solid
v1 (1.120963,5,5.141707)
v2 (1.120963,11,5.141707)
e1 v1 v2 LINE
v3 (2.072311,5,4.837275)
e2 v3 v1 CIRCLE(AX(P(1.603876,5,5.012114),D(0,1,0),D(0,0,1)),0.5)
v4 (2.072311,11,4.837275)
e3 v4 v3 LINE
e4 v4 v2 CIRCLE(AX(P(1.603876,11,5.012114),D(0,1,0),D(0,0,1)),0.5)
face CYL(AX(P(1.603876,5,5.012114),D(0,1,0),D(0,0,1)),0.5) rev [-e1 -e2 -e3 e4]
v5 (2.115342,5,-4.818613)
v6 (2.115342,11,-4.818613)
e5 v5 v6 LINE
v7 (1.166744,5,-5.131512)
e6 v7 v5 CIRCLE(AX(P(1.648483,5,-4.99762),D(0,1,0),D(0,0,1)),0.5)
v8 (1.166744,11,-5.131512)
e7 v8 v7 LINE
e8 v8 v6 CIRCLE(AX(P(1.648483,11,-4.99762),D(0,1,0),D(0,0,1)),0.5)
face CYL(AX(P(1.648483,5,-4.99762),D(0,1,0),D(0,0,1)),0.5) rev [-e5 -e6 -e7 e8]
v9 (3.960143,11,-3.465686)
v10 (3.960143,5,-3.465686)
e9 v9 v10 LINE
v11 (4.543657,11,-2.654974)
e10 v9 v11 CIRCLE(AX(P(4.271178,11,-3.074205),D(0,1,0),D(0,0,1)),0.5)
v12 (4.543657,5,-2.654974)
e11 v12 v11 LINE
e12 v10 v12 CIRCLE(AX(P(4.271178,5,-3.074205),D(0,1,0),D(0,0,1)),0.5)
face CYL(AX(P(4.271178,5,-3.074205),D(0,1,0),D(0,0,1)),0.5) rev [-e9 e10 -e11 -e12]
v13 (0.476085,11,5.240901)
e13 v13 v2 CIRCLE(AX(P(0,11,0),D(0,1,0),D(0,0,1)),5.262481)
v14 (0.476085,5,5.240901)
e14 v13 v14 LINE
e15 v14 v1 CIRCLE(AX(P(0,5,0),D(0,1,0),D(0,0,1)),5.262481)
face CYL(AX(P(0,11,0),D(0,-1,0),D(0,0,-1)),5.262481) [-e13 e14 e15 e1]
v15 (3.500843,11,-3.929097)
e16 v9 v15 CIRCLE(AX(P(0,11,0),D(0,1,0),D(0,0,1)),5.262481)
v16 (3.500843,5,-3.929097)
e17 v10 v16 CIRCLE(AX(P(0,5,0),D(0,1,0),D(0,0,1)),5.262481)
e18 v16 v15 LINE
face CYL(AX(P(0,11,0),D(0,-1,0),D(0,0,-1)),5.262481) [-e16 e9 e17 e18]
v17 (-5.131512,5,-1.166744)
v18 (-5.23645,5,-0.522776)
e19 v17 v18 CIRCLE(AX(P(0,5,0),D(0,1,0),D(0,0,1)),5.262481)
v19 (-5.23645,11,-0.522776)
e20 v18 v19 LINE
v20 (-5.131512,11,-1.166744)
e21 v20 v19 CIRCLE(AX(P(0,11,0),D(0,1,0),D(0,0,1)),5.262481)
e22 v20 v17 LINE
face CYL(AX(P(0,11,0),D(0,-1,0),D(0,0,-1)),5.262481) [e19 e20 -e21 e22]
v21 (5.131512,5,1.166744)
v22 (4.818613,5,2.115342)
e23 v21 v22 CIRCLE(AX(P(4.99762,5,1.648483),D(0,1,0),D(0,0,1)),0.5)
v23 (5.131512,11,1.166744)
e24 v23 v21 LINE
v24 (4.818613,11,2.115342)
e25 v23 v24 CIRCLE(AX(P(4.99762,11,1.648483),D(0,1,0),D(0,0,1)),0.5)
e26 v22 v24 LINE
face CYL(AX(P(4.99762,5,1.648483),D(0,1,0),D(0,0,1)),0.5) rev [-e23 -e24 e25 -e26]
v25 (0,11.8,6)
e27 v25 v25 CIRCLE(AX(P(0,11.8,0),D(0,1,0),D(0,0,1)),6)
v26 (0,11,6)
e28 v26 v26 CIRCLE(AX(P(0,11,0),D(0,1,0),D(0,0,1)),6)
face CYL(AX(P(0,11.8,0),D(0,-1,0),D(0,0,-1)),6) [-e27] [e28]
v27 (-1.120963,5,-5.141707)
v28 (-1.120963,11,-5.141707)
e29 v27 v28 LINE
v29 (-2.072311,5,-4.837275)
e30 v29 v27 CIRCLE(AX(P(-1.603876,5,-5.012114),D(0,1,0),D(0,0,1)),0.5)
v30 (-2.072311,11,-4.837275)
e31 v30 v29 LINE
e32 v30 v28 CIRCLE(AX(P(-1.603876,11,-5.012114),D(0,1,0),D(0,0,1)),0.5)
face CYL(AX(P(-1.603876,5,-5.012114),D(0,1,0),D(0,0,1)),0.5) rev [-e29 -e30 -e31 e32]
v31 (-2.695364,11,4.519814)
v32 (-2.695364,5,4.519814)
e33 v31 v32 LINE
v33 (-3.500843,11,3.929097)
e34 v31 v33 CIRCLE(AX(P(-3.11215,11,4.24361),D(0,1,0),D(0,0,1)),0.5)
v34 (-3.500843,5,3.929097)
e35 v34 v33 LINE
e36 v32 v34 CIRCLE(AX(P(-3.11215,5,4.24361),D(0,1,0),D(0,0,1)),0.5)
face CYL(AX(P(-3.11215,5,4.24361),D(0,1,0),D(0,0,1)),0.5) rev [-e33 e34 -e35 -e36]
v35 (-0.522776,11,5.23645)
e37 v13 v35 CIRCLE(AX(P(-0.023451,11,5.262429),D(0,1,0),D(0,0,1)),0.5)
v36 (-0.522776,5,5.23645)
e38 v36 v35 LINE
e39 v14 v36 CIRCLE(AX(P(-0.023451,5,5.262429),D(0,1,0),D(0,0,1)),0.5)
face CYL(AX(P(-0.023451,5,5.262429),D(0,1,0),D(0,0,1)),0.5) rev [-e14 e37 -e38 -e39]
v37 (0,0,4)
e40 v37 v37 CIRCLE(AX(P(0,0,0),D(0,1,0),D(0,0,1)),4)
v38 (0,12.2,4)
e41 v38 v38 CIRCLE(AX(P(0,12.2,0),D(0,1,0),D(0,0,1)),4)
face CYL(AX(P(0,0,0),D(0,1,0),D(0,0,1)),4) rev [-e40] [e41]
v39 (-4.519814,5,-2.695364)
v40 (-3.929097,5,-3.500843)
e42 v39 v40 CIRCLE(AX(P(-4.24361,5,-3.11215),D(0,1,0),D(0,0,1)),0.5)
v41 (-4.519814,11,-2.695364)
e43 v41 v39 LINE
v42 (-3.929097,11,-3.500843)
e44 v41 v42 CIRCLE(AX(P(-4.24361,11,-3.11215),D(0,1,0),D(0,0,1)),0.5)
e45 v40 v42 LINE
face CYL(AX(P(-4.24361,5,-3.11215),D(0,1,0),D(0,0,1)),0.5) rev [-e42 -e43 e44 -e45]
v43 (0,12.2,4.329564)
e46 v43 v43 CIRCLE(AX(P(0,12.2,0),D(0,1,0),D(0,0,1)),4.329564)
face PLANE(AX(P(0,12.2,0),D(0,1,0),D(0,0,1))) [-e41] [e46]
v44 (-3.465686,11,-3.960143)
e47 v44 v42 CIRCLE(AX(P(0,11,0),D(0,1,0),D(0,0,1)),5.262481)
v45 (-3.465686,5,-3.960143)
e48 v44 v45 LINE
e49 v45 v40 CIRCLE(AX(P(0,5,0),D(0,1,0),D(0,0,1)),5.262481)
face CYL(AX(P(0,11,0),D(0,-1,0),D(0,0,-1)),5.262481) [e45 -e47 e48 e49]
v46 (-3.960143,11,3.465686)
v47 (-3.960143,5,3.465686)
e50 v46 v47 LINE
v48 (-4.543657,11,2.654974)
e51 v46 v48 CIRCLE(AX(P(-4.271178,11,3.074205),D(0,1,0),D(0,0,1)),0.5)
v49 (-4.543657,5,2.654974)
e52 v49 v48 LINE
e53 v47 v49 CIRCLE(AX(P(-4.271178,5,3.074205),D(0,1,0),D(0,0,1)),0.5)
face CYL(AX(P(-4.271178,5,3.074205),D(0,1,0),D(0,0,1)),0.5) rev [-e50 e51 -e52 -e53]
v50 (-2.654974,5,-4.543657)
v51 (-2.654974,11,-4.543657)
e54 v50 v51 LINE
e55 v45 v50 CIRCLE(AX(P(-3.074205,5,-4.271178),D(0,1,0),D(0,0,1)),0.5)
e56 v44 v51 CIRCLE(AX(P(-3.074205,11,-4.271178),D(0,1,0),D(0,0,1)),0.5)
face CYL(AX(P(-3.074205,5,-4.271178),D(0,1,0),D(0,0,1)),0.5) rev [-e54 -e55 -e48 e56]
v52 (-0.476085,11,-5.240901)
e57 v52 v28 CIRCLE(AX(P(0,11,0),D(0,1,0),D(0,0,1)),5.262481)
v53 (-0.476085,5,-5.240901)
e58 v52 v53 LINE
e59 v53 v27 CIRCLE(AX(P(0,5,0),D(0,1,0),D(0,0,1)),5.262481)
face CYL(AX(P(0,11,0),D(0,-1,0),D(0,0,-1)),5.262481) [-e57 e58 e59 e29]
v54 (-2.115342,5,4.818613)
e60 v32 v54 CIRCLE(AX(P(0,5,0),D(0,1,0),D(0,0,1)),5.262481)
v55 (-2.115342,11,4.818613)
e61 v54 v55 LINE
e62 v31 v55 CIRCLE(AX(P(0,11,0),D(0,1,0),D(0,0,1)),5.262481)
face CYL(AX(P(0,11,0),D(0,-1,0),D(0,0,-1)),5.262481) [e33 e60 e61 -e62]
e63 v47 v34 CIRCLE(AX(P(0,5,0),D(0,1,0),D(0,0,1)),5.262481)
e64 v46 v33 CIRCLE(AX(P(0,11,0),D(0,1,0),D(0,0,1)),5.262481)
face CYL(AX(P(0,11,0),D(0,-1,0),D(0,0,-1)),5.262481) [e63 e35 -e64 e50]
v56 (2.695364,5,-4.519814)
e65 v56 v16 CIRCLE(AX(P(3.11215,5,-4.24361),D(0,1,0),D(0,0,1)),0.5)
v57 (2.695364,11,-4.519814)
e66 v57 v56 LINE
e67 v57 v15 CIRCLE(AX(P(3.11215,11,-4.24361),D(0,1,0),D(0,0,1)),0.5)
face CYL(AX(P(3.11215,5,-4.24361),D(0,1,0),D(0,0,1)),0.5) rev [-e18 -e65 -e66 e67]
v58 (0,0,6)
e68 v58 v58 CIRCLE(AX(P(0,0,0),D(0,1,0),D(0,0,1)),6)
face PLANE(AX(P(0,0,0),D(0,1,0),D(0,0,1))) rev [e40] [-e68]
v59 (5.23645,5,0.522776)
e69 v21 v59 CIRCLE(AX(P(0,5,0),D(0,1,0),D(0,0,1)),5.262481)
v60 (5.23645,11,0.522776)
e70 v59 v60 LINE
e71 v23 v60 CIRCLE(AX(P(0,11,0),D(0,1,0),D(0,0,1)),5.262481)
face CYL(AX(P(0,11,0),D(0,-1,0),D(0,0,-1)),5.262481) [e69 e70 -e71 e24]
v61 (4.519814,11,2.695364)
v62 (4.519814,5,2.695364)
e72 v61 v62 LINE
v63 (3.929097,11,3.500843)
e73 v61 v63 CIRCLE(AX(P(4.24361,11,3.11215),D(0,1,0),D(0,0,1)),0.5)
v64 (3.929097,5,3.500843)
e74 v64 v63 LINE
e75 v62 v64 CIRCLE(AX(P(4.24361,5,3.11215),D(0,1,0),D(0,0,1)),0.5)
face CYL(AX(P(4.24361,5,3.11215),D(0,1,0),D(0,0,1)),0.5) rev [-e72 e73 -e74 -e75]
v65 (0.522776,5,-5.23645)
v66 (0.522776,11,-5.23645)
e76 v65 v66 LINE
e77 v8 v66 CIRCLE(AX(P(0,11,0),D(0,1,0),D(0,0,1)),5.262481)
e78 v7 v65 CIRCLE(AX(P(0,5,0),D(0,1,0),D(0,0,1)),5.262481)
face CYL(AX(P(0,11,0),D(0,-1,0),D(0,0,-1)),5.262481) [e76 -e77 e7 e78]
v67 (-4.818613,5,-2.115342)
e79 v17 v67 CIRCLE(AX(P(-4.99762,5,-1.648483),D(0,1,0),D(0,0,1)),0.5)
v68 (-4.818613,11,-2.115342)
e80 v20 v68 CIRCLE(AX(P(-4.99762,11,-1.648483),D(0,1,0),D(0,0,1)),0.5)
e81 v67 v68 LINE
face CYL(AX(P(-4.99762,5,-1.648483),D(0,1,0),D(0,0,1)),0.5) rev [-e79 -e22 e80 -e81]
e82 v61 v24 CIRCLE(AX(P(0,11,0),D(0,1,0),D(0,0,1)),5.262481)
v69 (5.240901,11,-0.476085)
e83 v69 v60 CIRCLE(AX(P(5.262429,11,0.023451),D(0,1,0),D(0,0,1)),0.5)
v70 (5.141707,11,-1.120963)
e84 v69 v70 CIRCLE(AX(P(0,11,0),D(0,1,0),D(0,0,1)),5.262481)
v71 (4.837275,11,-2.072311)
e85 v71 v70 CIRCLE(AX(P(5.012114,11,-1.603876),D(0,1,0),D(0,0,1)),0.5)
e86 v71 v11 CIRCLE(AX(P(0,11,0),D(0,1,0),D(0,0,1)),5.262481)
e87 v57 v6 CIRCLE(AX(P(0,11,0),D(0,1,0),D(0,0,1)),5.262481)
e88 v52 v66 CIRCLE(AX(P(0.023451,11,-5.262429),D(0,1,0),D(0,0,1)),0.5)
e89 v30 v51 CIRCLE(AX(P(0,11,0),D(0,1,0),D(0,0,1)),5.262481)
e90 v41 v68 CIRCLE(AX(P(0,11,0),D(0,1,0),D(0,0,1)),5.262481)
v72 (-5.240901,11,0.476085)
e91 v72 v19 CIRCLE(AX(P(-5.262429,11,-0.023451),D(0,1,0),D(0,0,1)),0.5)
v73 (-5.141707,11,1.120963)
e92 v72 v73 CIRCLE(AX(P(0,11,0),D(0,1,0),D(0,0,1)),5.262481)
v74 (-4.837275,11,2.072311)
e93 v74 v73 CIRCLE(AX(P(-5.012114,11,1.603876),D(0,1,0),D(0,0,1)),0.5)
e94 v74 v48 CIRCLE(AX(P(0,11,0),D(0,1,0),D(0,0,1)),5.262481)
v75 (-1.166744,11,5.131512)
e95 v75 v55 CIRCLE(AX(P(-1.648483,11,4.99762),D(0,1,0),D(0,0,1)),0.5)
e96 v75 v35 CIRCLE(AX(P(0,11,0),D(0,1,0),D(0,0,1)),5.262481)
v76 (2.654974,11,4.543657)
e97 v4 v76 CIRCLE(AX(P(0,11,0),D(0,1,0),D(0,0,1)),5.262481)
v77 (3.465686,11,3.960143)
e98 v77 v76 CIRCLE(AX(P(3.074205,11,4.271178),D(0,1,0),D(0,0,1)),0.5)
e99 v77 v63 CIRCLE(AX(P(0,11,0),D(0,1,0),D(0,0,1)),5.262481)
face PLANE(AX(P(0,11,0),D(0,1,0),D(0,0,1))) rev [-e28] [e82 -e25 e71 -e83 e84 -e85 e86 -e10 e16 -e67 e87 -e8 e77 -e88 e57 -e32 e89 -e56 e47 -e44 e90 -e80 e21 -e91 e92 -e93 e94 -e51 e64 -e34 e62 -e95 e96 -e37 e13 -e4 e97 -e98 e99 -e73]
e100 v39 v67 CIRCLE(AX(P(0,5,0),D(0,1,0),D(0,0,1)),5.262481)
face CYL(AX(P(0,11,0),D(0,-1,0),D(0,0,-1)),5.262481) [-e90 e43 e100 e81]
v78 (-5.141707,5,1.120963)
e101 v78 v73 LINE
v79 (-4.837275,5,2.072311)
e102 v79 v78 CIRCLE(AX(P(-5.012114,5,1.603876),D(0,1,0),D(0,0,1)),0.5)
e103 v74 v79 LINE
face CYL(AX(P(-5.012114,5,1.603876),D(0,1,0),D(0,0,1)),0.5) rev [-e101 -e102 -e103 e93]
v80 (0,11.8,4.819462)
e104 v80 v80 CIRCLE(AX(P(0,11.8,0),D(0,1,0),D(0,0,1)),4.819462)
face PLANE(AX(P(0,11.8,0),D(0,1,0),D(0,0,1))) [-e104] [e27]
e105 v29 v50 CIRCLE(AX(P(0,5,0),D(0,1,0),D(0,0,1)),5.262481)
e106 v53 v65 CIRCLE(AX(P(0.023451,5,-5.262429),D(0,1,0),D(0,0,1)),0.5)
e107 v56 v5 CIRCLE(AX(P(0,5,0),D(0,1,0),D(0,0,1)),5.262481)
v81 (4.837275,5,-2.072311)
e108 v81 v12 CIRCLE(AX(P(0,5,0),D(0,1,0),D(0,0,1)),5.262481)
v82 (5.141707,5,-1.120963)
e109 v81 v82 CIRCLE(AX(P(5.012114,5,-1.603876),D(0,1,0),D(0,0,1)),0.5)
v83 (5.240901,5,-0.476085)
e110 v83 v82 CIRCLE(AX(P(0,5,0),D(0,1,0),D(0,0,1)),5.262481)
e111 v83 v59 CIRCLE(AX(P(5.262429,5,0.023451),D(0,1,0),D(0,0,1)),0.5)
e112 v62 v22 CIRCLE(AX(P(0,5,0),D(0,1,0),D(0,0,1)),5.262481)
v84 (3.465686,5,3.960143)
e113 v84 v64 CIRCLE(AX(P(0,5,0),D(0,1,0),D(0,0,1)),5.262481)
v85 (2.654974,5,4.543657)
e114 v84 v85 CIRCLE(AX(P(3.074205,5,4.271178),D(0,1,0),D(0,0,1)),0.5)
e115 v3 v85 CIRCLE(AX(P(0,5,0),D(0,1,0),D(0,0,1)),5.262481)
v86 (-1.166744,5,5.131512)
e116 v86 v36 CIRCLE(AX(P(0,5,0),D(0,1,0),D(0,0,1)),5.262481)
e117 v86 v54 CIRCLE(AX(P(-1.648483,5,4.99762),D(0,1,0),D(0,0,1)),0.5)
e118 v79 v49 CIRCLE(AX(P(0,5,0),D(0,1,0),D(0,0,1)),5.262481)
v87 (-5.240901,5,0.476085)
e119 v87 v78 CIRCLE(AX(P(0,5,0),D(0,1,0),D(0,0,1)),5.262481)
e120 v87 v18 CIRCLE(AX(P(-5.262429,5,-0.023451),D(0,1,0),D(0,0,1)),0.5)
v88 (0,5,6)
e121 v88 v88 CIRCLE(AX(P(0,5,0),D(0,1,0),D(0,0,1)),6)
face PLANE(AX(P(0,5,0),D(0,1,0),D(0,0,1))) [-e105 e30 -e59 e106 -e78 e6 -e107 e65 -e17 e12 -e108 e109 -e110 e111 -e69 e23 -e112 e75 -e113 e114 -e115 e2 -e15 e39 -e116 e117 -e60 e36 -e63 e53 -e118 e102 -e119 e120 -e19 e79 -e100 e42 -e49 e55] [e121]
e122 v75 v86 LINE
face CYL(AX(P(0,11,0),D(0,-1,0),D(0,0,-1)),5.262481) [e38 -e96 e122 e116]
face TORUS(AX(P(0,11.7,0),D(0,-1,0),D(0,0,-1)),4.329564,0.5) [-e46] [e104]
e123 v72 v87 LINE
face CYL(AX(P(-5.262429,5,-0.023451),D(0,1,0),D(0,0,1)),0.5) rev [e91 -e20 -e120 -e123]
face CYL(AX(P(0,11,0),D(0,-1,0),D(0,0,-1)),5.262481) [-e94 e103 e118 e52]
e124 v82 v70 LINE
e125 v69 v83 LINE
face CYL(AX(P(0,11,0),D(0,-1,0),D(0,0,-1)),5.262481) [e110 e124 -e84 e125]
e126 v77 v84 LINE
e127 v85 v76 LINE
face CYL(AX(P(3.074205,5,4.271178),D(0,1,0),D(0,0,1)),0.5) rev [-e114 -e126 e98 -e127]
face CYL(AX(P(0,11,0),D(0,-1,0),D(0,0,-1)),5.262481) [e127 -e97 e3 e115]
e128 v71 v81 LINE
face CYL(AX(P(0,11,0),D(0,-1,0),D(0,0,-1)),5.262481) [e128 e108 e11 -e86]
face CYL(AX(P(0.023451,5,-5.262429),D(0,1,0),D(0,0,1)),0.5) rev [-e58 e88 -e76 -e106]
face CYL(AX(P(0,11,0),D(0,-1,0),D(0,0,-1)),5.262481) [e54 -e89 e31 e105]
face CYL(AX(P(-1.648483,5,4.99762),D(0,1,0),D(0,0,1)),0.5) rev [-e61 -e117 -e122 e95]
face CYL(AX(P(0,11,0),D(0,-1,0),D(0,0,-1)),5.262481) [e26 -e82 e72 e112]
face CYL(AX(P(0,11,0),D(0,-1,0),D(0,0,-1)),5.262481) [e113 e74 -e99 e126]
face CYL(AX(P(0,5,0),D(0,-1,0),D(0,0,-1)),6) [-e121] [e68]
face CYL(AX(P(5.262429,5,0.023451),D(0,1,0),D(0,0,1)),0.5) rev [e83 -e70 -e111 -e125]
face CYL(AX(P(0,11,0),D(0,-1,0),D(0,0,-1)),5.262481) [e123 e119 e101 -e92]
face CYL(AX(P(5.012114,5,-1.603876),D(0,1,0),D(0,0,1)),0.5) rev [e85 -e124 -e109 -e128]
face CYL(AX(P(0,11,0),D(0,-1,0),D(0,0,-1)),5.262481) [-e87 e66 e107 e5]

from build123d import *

# Parameters (mm, degrees)
SKETCH1_R           = 6
BOSS_EXTRUDE1_DEPTH = 5
SKETCH2_R           = 5.262480872
BOSS_EXTRUDE2_DEPTH = 6
SKETCH3_R           = 0.5
CUT_EXTRUDE1_DEPTH  = 6
SKETCH4_R           = 6
BOSS_EXTRUDE3_DEPTH = 0.8
SKETCH5_R           = 4.819461856
BOSS_EXTRUDE4_DEPTH = 0.4
FILLET3_R           = 0.5
SKETCH6_R           = 4
CUT_EXTRUDE2_DEPTH  = 15.860686391


with BuildPart() as part:
    # Sketch1 → Boss-Extrude1 (new body)
    with BuildSketch(Plane(origin=(0, 0, 0), x_dir=(1, 0, 0), z_dir=(0, 1, 0))):
        with Locations(Location((0, 0, 0), (0, 0, 270))):
            Circle(SKETCH1_R)
    extrude(amount=BOSS_EXTRUDE1_DEPTH)

    # Sketch2 → Boss-Extrude2 (add)
    with BuildSketch(Plane(origin=(0, 5, 0), x_dir=(1, 0, 0), z_dir=(0, 1, 0))):
        with Locations(Location((0, 0, 0), (0, 0, 270))):
            Circle(SKETCH2_R)
    extrude(amount=BOSS_EXTRUDE2_DEPTH)

    # Sketch3 → Cut-Extrude1 (cut)
    with BuildSketch(Plane(origin=(0, 11, 0), x_dir=(1, 0, 0), z_dir=(0, 1, 0))):
        with Locations((-1.603876434, 5.012113856)):
            Circle(SKETCH3_R)
        with Locations((0.023451225, 5.262428619)):
            Circle(SKETCH3_R)
        with Locations((1.648483316, 4.997620202)):
            Circle(SKETCH3_R)
        with Locations((3.112150373, 4.2436099)):
            Circle(SKETCH3_R)
        with Locations((4.271178469, 3.074205493)):
            Circle(SKETCH3_R)
        with Locations((5.012113856, 1.603876434)):
            Circle(SKETCH3_R)
        with Locations((5.262428619, -0.023451225)):
            Circle(SKETCH3_R)
        with Locations((4.997620202, -1.648483316)):
            Circle(SKETCH3_R)
        with Locations((4.2436099, -3.112150373)):
            Circle(SKETCH3_R)
        with Locations((3.074205493, -4.271178469)):
            Circle(SKETCH3_R)
        with Locations((1.603876434, -5.012113856)):
            Circle(SKETCH3_R)
        with Locations((-0.023451225, -5.262428619)):
            Circle(SKETCH3_R)
        with Locations((-1.648483316, -4.997620202)):
            Circle(SKETCH3_R)
        with Locations((-3.112150373, -4.2436099)):
            Circle(SKETCH3_R)
        with Locations((-4.271178469, -3.074205493)):
            Circle(SKETCH3_R)
        with Locations((-5.012113856, -1.603876434)):
            Circle(SKETCH3_R)
        with Locations((-5.262428619, 0.023451225)):
            Circle(SKETCH3_R)
        with Locations((-4.997620202, 1.648483316)):
            Circle(SKETCH3_R)
        with Locations((-4.2436099, 3.112150373)):
            Circle(SKETCH3_R)
        with Locations((-3.074205493, 4.271178469)):
            Circle(SKETCH3_R)
    extrude(amount=-CUT_EXTRUDE1_DEPTH, mode=Mode.SUBTRACT)

    # Sketch4 → Boss-Extrude3 (add)
    with BuildSketch(Plane(origin=(0, 11, 0), x_dir=(1, 0, 0), z_dir=(0, 1, 0))):
        with Locations(Location((0, 0, 0), (0, 0, 270))):
            Circle(SKETCH4_R)
    extrude(amount=BOSS_EXTRUDE3_DEPTH)

    # Sketch5 → Boss-Extrude4 (add)
    with BuildSketch(Plane(origin=(0, 11.8, 0), x_dir=(1, 0, 0), z_dir=(0, 1, 0))):
        with Locations(Location((0, 0, 0), (0, 0, 270))):
            Circle(SKETCH5_R)
    extrude(amount=BOSS_EXTRUDE4_DEPTH)

    # Fillet3
    # the kernel refuses this fillet: 0.5 mm, written as the material it takes off along each edge
    with BuildSketch(Plane(origin=(0, 12.2, 0), x_dir=(0, 0, 1), z_dir=(-1, 0, 0))) as fillet3_piece_1:
        with BuildLine():
            CenterArc((4.329563907, -0.5), FILLET3_R, 11.536959033, 78.463040967)
            Line((4.329563907, 0), (4.329563907, 0.01))
            Line((4.329563907, 0.01), (4.819461856, 0.01))
            Line((4.819461856, 0.01), (4.829461856, 0))
            ThreePointArc((4.829461856, 0), (4.829461856, -0.2), (4.829259815, -0.398))
            Line((4.829259815, -0.398), (4.819461856, -0.4))
        make_face()
    revolve(axis=Axis((0, 12.2, 0), (0, 1, 0)), mode=Mode.SUBTRACT)

    # Sketch6 → Cut-Extrude2 (cut, through all)
    with BuildSketch(Plane(origin=(0, 12.2, 0), x_dir=(1, 0, 0), z_dir=(0, 1, 0))):
        with Locations(Location((0, 0, 0), (0, 0, 270))):
            Circle(SKETCH6_R)
    extrude(amount=-CUT_EXTRUDE2_DEPTH, mode=Mode.SUBTRACT)


solid = part.part
